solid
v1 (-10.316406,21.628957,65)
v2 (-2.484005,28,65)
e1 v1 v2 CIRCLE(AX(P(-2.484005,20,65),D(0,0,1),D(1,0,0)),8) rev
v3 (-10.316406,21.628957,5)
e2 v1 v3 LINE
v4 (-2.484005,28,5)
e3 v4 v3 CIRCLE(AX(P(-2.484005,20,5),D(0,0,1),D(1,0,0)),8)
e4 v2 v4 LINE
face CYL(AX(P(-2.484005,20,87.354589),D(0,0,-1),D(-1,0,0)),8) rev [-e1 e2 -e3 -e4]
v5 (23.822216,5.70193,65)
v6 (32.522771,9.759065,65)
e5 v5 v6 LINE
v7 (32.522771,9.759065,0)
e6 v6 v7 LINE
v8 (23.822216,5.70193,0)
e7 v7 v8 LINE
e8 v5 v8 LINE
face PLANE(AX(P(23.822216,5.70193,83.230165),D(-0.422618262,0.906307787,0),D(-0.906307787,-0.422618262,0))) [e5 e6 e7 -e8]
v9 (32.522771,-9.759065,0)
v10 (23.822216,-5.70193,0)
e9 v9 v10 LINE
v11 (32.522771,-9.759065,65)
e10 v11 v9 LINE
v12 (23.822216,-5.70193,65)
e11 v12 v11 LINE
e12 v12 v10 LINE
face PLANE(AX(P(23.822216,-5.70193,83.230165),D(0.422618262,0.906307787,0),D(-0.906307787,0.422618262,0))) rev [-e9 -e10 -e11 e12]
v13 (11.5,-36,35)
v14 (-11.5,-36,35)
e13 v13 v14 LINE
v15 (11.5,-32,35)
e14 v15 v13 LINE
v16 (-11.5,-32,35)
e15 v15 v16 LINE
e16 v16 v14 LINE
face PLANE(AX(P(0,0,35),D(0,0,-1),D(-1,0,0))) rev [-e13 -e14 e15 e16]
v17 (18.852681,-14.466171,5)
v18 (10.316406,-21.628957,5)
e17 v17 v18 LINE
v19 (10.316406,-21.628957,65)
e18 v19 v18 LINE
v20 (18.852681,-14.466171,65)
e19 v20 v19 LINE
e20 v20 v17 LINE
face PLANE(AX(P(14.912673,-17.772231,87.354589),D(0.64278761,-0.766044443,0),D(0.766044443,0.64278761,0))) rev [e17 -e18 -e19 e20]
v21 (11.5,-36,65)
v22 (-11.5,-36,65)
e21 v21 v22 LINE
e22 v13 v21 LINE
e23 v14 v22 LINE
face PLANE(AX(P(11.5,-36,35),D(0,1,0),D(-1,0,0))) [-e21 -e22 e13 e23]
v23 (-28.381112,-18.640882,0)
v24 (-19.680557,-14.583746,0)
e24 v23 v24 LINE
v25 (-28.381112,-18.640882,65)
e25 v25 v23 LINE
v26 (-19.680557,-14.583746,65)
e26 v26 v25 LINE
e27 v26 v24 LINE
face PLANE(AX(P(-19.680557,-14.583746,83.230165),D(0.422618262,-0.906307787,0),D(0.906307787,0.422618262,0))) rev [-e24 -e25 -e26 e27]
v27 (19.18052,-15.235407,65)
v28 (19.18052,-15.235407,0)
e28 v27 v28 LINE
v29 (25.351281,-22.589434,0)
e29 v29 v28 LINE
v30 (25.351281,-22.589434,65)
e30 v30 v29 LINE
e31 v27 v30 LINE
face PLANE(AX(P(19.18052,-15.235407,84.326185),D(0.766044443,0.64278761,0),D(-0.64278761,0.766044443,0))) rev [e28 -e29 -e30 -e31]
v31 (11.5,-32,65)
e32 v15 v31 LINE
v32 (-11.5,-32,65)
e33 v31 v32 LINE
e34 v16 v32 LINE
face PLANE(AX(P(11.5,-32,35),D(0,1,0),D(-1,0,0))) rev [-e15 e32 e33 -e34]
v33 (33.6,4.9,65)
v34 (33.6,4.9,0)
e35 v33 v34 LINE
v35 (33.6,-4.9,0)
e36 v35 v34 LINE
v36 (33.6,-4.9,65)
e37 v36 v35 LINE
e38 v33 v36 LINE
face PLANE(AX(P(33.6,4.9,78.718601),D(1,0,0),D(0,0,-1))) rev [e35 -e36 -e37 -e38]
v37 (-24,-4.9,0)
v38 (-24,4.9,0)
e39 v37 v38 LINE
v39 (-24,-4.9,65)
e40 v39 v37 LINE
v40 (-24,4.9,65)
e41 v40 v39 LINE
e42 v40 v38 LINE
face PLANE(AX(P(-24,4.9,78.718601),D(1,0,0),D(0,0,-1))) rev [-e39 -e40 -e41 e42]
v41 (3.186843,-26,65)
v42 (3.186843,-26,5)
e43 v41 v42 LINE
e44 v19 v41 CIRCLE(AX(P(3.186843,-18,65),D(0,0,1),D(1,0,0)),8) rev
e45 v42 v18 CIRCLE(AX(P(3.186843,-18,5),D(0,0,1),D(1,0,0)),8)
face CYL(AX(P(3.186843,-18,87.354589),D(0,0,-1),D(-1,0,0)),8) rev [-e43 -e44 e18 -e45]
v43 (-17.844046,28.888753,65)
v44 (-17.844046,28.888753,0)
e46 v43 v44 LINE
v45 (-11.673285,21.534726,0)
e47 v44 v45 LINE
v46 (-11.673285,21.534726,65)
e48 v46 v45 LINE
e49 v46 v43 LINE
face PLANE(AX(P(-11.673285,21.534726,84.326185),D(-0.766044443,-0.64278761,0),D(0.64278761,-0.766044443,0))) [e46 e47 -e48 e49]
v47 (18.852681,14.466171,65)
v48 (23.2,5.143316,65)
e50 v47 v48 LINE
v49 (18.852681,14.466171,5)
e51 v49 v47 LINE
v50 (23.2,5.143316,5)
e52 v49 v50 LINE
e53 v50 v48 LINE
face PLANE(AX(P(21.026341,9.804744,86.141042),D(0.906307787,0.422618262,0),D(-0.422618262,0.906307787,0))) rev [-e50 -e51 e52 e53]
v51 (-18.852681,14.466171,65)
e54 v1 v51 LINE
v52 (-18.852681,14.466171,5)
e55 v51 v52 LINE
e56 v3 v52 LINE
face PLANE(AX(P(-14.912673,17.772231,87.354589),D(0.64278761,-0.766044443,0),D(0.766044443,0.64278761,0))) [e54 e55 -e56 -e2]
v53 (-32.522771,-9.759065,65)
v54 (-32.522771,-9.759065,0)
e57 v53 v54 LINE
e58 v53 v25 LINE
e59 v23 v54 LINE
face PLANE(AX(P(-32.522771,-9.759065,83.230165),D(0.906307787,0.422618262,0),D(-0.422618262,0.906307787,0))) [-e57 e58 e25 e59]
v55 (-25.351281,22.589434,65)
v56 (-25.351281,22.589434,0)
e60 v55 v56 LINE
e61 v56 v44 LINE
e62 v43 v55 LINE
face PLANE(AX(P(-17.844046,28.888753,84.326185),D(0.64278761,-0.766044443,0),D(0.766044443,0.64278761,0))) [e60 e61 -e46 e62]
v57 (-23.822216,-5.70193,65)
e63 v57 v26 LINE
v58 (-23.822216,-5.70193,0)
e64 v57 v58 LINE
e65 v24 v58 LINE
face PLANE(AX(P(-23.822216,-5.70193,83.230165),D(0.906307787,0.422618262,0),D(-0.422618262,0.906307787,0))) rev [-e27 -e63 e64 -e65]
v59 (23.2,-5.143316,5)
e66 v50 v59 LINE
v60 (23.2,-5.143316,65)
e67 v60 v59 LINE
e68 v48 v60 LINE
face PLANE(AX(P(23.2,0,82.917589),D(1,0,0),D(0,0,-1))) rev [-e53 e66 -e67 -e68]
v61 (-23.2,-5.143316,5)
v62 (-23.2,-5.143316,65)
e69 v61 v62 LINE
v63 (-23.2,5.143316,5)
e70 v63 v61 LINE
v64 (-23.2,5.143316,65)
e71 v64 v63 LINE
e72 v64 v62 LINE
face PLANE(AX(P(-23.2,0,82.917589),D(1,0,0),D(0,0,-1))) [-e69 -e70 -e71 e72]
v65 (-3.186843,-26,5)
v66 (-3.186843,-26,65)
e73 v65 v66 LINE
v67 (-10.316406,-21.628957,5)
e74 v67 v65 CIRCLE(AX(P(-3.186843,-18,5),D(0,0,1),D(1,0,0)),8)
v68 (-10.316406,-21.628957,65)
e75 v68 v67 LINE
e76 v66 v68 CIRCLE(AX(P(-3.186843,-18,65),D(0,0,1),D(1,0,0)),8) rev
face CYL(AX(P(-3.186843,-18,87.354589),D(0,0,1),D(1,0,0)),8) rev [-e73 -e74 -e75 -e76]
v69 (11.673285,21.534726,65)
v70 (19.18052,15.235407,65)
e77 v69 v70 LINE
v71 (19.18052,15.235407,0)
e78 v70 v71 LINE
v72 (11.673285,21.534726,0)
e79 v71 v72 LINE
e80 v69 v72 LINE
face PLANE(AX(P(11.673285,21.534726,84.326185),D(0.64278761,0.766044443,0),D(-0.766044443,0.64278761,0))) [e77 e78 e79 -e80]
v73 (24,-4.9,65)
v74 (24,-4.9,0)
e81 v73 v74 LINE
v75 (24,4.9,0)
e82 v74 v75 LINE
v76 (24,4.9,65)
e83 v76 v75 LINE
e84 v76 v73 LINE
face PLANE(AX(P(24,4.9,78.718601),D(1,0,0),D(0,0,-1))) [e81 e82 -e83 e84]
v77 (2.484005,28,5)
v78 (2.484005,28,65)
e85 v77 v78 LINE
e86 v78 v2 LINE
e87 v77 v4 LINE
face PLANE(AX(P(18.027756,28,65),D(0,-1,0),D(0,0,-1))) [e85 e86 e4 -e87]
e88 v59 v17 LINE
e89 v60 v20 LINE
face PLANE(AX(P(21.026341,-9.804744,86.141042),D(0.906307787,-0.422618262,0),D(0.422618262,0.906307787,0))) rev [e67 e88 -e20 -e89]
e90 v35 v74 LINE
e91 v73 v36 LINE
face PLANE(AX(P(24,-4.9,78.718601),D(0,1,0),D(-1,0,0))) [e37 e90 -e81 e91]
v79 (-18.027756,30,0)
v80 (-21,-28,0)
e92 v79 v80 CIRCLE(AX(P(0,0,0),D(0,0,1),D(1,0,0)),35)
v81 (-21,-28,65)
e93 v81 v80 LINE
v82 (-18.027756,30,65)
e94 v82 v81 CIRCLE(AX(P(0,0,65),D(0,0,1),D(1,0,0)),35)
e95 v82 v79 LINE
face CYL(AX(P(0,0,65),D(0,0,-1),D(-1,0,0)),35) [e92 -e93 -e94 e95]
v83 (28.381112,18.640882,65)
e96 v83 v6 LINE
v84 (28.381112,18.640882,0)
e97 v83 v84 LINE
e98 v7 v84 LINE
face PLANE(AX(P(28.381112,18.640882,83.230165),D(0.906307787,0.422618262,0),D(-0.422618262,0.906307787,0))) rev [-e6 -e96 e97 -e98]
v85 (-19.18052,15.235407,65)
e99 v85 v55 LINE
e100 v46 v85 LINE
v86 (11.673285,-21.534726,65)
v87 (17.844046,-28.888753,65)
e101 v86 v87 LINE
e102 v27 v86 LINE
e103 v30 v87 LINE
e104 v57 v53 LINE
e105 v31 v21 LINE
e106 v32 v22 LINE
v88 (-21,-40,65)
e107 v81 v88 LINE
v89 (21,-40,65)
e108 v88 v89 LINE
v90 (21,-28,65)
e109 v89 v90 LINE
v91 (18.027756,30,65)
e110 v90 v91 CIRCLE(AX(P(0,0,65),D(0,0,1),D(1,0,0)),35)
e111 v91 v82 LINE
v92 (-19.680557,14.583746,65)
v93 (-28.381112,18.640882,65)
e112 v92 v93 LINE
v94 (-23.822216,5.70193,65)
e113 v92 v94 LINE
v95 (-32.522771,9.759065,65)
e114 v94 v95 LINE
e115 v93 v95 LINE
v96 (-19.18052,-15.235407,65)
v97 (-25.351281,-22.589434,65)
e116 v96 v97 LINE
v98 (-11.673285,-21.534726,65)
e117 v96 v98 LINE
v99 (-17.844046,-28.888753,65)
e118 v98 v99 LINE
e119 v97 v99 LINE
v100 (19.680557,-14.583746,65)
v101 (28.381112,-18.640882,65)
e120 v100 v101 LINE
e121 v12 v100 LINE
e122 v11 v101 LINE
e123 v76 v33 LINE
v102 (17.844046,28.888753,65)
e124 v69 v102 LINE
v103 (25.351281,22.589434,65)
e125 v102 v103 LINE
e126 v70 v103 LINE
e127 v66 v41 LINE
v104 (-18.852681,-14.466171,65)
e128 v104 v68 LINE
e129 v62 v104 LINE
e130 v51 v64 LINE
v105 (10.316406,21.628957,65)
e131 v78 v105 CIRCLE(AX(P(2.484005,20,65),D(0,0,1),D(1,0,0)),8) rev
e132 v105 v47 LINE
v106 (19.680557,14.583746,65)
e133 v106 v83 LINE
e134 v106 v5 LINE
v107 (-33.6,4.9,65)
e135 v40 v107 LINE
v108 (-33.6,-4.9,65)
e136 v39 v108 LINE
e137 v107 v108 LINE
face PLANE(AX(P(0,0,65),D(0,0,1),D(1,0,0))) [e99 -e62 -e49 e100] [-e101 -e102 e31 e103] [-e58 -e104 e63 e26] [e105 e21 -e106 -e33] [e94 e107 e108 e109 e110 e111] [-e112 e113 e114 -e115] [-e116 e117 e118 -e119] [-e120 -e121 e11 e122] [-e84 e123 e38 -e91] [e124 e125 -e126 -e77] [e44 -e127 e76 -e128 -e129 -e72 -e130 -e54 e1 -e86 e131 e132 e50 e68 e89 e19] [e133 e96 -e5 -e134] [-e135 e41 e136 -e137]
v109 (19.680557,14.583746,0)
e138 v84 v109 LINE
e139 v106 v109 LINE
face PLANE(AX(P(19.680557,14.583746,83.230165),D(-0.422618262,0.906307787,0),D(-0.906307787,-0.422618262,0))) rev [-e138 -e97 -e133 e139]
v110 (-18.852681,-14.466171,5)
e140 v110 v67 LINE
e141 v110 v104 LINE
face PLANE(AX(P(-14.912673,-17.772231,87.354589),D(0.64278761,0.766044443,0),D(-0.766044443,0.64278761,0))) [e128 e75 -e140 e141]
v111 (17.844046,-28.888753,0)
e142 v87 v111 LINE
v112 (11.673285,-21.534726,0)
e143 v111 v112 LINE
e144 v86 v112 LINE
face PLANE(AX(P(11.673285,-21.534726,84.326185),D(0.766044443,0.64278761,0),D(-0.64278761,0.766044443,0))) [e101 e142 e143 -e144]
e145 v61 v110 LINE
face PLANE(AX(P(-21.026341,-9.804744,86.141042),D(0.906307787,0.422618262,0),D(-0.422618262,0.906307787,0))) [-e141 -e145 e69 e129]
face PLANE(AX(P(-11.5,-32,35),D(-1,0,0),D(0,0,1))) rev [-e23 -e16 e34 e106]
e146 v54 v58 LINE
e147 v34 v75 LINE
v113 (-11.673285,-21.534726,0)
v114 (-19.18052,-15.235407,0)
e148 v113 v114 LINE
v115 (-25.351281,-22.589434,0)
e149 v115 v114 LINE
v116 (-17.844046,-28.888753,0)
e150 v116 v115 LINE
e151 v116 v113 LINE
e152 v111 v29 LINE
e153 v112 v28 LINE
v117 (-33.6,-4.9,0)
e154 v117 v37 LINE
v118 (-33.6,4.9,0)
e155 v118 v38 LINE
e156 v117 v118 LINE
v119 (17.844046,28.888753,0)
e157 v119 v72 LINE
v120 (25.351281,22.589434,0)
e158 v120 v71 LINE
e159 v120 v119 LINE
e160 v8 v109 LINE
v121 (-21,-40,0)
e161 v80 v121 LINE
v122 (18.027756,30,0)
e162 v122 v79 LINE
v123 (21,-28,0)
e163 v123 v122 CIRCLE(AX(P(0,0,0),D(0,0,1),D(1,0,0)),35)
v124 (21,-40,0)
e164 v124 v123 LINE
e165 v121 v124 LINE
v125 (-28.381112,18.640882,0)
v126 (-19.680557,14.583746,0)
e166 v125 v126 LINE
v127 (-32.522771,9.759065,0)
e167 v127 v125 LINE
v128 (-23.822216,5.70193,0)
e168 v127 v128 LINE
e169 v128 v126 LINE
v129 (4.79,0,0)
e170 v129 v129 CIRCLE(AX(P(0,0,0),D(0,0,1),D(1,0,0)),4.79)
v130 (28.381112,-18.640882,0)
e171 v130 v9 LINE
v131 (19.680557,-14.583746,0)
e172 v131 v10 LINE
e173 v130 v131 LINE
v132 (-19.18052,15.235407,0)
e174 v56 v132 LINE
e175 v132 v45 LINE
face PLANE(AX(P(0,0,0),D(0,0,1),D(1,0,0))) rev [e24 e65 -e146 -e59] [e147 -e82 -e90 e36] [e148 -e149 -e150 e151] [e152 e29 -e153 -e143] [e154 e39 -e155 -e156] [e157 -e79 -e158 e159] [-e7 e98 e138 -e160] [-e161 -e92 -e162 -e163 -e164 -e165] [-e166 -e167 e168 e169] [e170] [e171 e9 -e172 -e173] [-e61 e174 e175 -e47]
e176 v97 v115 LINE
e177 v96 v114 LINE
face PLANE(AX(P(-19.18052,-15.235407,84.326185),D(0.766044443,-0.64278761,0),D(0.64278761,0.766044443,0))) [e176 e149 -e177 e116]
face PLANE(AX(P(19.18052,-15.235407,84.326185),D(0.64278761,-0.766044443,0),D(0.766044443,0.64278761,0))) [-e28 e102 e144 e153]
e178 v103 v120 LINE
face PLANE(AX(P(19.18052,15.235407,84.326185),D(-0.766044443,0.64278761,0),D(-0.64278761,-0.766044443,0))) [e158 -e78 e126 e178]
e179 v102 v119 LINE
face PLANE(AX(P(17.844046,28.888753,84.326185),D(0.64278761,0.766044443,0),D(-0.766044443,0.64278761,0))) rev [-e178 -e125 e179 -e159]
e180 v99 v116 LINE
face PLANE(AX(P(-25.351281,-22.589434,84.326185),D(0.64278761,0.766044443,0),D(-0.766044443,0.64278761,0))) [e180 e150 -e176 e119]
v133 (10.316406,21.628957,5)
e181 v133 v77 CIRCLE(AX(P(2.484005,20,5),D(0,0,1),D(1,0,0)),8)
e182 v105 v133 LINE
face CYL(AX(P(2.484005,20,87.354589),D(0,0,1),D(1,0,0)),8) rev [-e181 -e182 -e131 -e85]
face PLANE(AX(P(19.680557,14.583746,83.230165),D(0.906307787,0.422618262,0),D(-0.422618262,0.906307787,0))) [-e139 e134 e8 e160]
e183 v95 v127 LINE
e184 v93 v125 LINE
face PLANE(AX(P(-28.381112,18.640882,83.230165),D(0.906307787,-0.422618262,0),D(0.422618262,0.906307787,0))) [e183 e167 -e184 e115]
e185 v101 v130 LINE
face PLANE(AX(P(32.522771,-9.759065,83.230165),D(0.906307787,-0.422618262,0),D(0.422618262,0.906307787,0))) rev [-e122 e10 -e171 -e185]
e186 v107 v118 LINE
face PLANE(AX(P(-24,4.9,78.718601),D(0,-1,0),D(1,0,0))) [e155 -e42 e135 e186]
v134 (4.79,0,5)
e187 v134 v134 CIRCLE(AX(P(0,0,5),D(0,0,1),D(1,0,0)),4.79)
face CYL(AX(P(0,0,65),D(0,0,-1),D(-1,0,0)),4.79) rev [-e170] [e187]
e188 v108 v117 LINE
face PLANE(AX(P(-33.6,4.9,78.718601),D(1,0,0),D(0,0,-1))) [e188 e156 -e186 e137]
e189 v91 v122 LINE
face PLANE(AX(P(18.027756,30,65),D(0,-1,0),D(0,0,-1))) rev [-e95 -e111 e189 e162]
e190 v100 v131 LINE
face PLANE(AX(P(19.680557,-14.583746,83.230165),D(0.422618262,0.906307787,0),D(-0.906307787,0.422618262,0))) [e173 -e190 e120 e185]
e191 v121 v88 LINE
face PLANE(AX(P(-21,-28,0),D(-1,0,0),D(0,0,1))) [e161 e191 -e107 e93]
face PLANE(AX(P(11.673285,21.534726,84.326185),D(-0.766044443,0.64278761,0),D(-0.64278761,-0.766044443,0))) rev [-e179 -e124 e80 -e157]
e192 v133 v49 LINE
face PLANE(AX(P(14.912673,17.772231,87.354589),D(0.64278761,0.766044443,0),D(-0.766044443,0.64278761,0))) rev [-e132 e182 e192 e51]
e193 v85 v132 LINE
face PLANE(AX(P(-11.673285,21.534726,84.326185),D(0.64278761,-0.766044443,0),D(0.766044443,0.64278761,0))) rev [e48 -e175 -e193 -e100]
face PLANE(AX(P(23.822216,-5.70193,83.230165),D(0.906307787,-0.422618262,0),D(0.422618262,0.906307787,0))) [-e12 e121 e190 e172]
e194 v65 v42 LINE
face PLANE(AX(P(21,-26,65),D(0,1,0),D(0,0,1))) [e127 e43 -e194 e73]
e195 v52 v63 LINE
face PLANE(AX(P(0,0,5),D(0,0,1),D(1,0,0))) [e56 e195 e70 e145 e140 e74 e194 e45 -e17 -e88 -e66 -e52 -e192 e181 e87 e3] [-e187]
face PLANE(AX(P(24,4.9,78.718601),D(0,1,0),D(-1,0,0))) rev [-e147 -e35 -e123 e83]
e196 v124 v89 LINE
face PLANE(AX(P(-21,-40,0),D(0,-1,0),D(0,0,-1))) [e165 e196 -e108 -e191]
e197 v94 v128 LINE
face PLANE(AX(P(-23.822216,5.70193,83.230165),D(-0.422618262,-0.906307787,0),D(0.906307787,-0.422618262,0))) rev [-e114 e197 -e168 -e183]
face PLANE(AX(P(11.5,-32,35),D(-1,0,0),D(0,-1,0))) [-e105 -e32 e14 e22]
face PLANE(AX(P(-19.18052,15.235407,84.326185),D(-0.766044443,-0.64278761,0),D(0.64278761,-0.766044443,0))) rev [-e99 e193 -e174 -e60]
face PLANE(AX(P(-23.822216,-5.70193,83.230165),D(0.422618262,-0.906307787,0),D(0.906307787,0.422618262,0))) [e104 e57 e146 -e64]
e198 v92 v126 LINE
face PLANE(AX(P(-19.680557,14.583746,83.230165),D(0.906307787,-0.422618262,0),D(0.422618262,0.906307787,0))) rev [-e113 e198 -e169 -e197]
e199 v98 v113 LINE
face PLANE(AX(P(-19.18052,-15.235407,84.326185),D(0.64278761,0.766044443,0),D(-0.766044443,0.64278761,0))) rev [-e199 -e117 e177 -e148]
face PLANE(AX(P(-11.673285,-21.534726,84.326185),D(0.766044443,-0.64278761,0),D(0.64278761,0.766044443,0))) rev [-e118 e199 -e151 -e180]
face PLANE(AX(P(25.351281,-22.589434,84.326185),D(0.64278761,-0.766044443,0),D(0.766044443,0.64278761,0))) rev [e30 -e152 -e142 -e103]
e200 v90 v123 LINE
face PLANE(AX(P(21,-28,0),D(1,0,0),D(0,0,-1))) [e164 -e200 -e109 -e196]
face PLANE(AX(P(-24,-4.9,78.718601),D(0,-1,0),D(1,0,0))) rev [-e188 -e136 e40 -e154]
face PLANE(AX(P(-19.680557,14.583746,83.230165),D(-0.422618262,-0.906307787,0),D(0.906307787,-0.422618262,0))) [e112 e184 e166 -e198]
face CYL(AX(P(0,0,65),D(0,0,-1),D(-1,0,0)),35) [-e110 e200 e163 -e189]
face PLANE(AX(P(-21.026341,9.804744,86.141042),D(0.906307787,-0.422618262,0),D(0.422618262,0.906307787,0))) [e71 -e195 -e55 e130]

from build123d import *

# Parameters (mm, degrees)
SKETCH2_R                       = 4.79
BOSS_EXTRUDE2_DEPTH             = 65
SHELL4_START                    = 5
SHELL4_OUTLINE_R                = 4.79
SHELL4_DEPTH                    = 60
SKETCH3_W                       = 42
SKETCH3_H                       = 12
BOSS_EXTRUDE3_DEPTH             = 65
SKETCH4_W                       = 23
SKETCH4_H                       = 4
CUT_EXTRUDE1_DEPTH              = 30
BOSS_EXTRUDE4_DEPTH             = 60
CIRPATTERN2_COUNT               = 3
CIRPATTERN2_ANGLE               = 50
CIRPATTERN2_THE_OTHER_WAY_COUNT = 3
CIRPATTERN2_THE_OTHER_WAY_ANGLE = 50
CUT_EXTRUDE2_START              = -5
SKETCH5_4_W                     = 9.6
SKETCH5_4_H                     = 9.8
CUT_EXTRUDE2_DEPTH              = 65
CIRPATTERN3_COUNT               = 3
CIRPATTERN3_ANGLE               = 50
CIRPATTERN3_THE_OTHER_WAY_COUNT = 3
CIRPATTERN3_THE_OTHER_WAY_ANGLE = 50
MIRROR1_OUTLINE_W               = 9.6
MIRROR1_OUTLINE_H               = 9.8
MIRROR1_DEPTH                   = 65
MIRROR1_START                   = 5
MIRROR1_2_DEPTH                 = 60
FILLET1_R                       = 8


# Read off the part's stored shape, not the designer's step: Shell4, Mirror1
with BuildPart() as part:
    # Sketch2 → Boss-Extrude2 (new body)
    with BuildSketch(Plane.XY):
        with BuildLine():
            Line((18.027756377, 30), (-18.027756377, 30))
            ThreePointArc((-18.027756377, 30), (-34.954133403, 1.791244829), (-21, -28))
            Line((-21, -28), (21, -28))
            ThreePointArc((21, -28), (34.954133403, 1.791244829), (18.027756377, 30))
        make_face()
        Circle(SKETCH2_R, mode=Mode.SUBTRACT)
    extrude(amount=BOSS_EXTRUDE2_DEPTH)

    # Shell4 outline → Shell4 (cut)
    with BuildSketch(Plane.XY.offset(SHELL4_START)):
        with BuildLine():
            ThreePointArc((-17.464249197, 28), (-32.953872935, 1.744207141), (-20.322401433, -26))
            Line((-20.322401433, -26), (20.322401433, -26))
            ThreePointArc((20.322401433, -26), (32.953872935, 1.744207141), (17.464249197, 28))
            Line((17.464249197, 28), (-17.464249197, 28))
        make_face()
        Circle(SHELL4_OUTLINE_R, mode=Mode.SUBTRACT)
    extrude(amount=SHELL4_DEPTH, mode=Mode.SUBTRACT)

    # Sketch3 → Boss-Extrude3 (add)
    with BuildSketch(Plane.XY.offset(65)):
        with Locations((0, -34)):
            Rectangle(SKETCH3_W, SKETCH3_H)
    extrude(amount=-BOSS_EXTRUDE3_DEPTH)

    # Sketch4 → Cut-Extrude1 (cut)
    with BuildSketch(Plane.XY.offset(65)):
        with Locations((0, -34)):
            Rectangle(SKETCH4_W, SKETCH4_H)
    extrude(amount=-CUT_EXTRUDE1_DEPTH, mode=Mode.SUBTRACT)

    # Sketch5 → Boss-Extrude4 (add)
    with BuildSketch(Plane.XY.offset(5)):
        with BuildLine():
            Line((24, 0), (23.2, 0))
            Line((23.2, 0), (23.2, -6))
            Line((23.2, -6), (32.136427928, -7.5))
            ThreePointArc((32.136427928, -7.5), (32.411387807, -6.204993184), (32.634184531, -4.9))
            Line((32.634184531, -4.9), (24, -4.9))
            Line((24, -4.9), (24, 0))
        make_face()
        with BuildLine():
            Line((23.2, 6), (23.2, 0))
            Line((23.2, 0), (24, 0))
            Line((24, 0), (24, 4.9))
            Line((24, 4.9), (32.634184531, 4.9))
            ThreePointArc((32.634184531, 4.9), (32.411387807, 6.204993184), (32.136427928, 7.5))
            Line((32.136427928, 7.5), (23.2, 6))
        make_face()
        with BuildLine():
            Line((33, 0), (24, 0))
            Line((24, 0), (24, -4.9))
            Line((24, -4.9), (32.634184531, -4.9))
            ThreePointArc((32.634184531, -4.9), (32.908419056, -2.456818113), (33, 0))
        make_face()
        with BuildLine():
            Line((24, 4.9), (24, 0))
            Line((24, 0), (33, 0))
            ThreePointArc((33, 0), (32.908419056, 2.456818113), (32.634184531, 4.9))
            Line((32.634184531, 4.9), (24, 4.9))
        make_face()
    boss_extrude4 = extrude(amount=BOSS_EXTRUDE4_DEPTH)

    # CirPattern2: Boss-Extrude4 ×3 about axis
    cirpattern2_axis = Axis((0, 0, 0), (0, 0, -1))
    for i in range(1, CIRPATTERN2_COUNT):
        add(boss_extrude4.rotate(cirpattern2_axis, i * CIRPATTERN2_ANGLE / (CIRPATTERN2_COUNT - 1)))

    # CirPattern2 the other way: Boss-Extrude4 ×3 about axis
    cirpattern2_the_other_way_axis = Axis((0, 0, 0), (0, 0, 1))
    for i in range(1, CIRPATTERN2_THE_OTHER_WAY_COUNT):
        add(boss_extrude4.rotate(cirpattern2_the_other_way_axis, i * CIRPATTERN2_THE_OTHER_WAY_ANGLE / (CIRPATTERN2_THE_OTHER_WAY_COUNT - 1)))

    # Sketch5<4> → Cut-Extrude2 (cut)
    with BuildSketch(Plane.XY.offset(5).offset(CUT_EXTRUDE2_START)):
        with Locations((28.8, 0)):
            Rectangle(SKETCH5_4_W, SKETCH5_4_H)
    cut_extrude2 = extrude(amount=CUT_EXTRUDE2_DEPTH, mode=Mode.SUBTRACT)

    # CirPattern3: Cut-Extrude2 ×3 about axis
    cirpattern3_axis = Axis((0, 0, 0), (0, 0, 1))
    for i in range(1, CIRPATTERN3_COUNT):
        add(cut_extrude2.rotate(cirpattern3_axis, i * CIRPATTERN3_ANGLE / (CIRPATTERN3_COUNT - 1)), mode=Mode.SUBTRACT)

    # CirPattern3 the other way: Cut-Extrude2 ×3 about axis
    cirpattern3_the_other_way_axis = Axis((0, 0, 0), (0, 0, -1))
    for i in range(1, CIRPATTERN3_THE_OTHER_WAY_COUNT):
        add(cut_extrude2.rotate(cirpattern3_the_other_way_axis, i * CIRPATTERN3_THE_OTHER_WAY_ANGLE / (CIRPATTERN3_THE_OTHER_WAY_COUNT - 1)), mode=Mode.SUBTRACT)

    # Mirror1 outline → Mirror1 (cut)
    with BuildSketch(Plane.XY):
        with Locations((-28.8, 0)):
            Rectangle(MIRROR1_OUTLINE_W, MIRROR1_OUTLINE_H)
        Polygon((-19.680557406, 14.583746438), (-28.381112162, 18.640881751), (-32.522771127, 9.759065438), (-23.822216371, 5.701930125), align=None)
        Polygon((-28.381112162, -18.640881751), (-19.680557406, -14.583746438), (-23.822216371, -5.701930125), (-32.522771127, -9.759065438), align=None)
        Polygon((-11.673284861, 21.534725922), (-17.844045914, 28.888752576), (-25.351281457, 22.589434001), (-19.180520404, 15.235407347), align=None)
        Polygon((-17.844045914, -28.888752576), (-11.673284861, -21.534725922), (-19.180520404, -15.235407347), (-25.351281457, -22.589434001), align=None)
    extrude(amount=MIRROR1_DEPTH, mode=Mode.SUBTRACT)

    # Mirror1 2 outline → Mirror1 2 (add)
    with BuildSketch(Plane.XY.offset(MIRROR1_START)):
        with BuildLine():
            ThreePointArc((-31.647445046, 9.350894183), (-32.217768235, 7.14250726), (-32.63418453, 4.9))
            Line((-32.63418453, 4.9), (-24, 4.9))
            Line((-24, 4.9), (-24, -4.9))
            Line((-24, -4.9), (-32.63418453, -4.9))
            ThreePointArc((-32.63418453, -4.9), (-32.217768234, -7.14250726), (-31.647445046, -9.350894183))
            Line((-31.647445046, -9.350894183), (-23.822216371, -5.701930125))
            Line((-23.822216371, -5.701930125), (-19.680557406, -14.583746438))
            Line((-19.680557406, -14.583746438), (-27.505786081, -18.232710496))
            ThreePointArc((-27.505786081, -18.232710496), (-26.18066023, -20.089127157), (-24.73046724, -21.849576428))
            Line((-24.73046724, -21.849576428), (-19.180520404, -15.235407347))
            Line((-19.180520404, -15.235407347), (-11.673284861, -21.534725922))
            Line((-11.673284861, -21.534725922), (-15.420094693, -26))
            Line((-15.420094693, -26), (-12.888229067, -26))
            Line((-12.888229067, -26), (-10.316405886, -21.628956738))
            Line((-10.316405886, -21.628956738), (-18.852681319, -14.466171171))
            Line((-18.852681319, -14.466171171), (-23.2, -5.143316173))
            Line((-23.2, -5.143316173), (-23.2, 5.143316173))
            Line((-23.2, 5.143316173), (-18.852681319, 14.466171171))
            Line((-18.852681319, 14.466171171), (-10.316405886, 21.628956738))
            Line((-10.316405886, 21.628956738), (-14.064983918, 28))
            Line((-14.064983918, 28), (-17.098293955, 28))
            Line((-17.098293955, 28), (-11.673284861, 21.534725922))
            Line((-11.673284861, 21.534725922), (-19.180520404, 15.235407347))
            Line((-19.180520404, 15.235407347), (-24.73046724, 21.849576428))
            ThreePointArc((-24.73046724, 21.849576428), (-26.18066023, 20.089127157), (-27.505786081, 18.232710496))
            Line((-27.505786081, 18.232710496), (-19.680557406, 14.583746438))
            Line((-19.680557406, 14.583746438), (-23.822216371, 5.701930125))
            Line((-23.822216371, 5.701930125), (-31.647445046, 9.350894183))
        make_face()
    extrude(amount=MIRROR1_2_DEPTH)

    # Fillet1
    # the kernel refuses this fillet: 8 mm, written as the material it adds along each edge
    with BuildSketch(Plane(origin=(14.064983918, 28, 5), x_dir=(-0.507111132951345, -0.8618806755211555, 0), z_dir=(0, 0, 1))) as fillet1_piece_1:
        with BuildLine():
            CenterArc((12.767888624, -5.924532666), FILLET1_R, 132.220297842, 78.251296778)
            Line((5.87284322, -9.98142173), (5.734942312, -10.062559511))
            Line((5.734942312, -10.062559511), (-0.137900908, -0.081137781))
            Line((-0.137900908, -0.081137781), (0, 0.16))
            ThreePointArc((0, 0.16), (3.696012361, 0.16), (7.284507445, 0.118490653))
            Line((7.284507445, 0.118490653), (7.392024723, 0))
        make_face()
    extrude(amount=60)
    with BuildSketch(Plane(origin=(-12.888229067, -26, 5), x_dir=(0.5071111329155005, 0.8618806755422457, 0), z_dir=(0, 0, 1))) as fillet1_piece_2:
        with BuildLine():
            CenterArc((11.814726499, -4.304548479), FILLET1_R, 147.447746104, 63.023848513)
            Line((4.919681094, -8.361437543), (4.781780186, -8.442575324))
            Line((4.781780186, -8.442575324), (-0.137900908, -0.081137781))
            Line((-0.137900908, -0.081137781), (0, 0.16))
            ThreePointArc((0, 0.16), (2.535758943, 0.16), (4.936653714, 0.08609097))
            Line((4.936653714, 0.08609097), (5.071517886, 0))
        make_face()
    extrude(amount=60)
    with BuildSketch(Plane(origin=(-14.064983918, 28, 5), x_dir=(1, 0, 0), z_dir=(0, 0, 1))) as fillet1_piece_3:
        with BuildLine():
            CenterArc((11.580978682, -8), FILLET1_R, 90, 78.251296781)
            Line((3.748578032, -6.371043262), (3.591930019, -6.338464127))
            ThreePointArc((3.591930019, -6.338464127), (1.736388108, -3.266659412), (-0.137900908, -0.081137781))
            Line((-0.137900908, -0.081137781), (0, 0.16))
            Line((0, 0.16), (11.580978682, 0.16))
            Line((11.580978682, 0.16), (11.580978682, 0))
        make_face()
    extrude(amount=60)
    with BuildSketch(Plane(origin=(12.888229067, -26, 65), x_dir=(-1, 0, 0), z_dir=(0, 0, -1))) as fillet1_piece_4:
        with BuildLine():
            CenterArc((9.701386491, 8), FILLET1_R, 206.97615149, 63.02384851)
            Line((2.571823181, 4.371043262), (2.429231915, 4.298464127))
            ThreePointArc((2.429231915, 4.298464127), (1.148010682, 2.266659412), (-0.137900908, 0.081137781))
            Line((-0.137900908, 0.081137781), (0, -0.16))
            Line((0, -0.16), (9.701386491, -0.16))
            Line((9.701386491, -0.16), (9.701386491, 0))
        make_face()
    extrude(amount=60)


solid = part.part
